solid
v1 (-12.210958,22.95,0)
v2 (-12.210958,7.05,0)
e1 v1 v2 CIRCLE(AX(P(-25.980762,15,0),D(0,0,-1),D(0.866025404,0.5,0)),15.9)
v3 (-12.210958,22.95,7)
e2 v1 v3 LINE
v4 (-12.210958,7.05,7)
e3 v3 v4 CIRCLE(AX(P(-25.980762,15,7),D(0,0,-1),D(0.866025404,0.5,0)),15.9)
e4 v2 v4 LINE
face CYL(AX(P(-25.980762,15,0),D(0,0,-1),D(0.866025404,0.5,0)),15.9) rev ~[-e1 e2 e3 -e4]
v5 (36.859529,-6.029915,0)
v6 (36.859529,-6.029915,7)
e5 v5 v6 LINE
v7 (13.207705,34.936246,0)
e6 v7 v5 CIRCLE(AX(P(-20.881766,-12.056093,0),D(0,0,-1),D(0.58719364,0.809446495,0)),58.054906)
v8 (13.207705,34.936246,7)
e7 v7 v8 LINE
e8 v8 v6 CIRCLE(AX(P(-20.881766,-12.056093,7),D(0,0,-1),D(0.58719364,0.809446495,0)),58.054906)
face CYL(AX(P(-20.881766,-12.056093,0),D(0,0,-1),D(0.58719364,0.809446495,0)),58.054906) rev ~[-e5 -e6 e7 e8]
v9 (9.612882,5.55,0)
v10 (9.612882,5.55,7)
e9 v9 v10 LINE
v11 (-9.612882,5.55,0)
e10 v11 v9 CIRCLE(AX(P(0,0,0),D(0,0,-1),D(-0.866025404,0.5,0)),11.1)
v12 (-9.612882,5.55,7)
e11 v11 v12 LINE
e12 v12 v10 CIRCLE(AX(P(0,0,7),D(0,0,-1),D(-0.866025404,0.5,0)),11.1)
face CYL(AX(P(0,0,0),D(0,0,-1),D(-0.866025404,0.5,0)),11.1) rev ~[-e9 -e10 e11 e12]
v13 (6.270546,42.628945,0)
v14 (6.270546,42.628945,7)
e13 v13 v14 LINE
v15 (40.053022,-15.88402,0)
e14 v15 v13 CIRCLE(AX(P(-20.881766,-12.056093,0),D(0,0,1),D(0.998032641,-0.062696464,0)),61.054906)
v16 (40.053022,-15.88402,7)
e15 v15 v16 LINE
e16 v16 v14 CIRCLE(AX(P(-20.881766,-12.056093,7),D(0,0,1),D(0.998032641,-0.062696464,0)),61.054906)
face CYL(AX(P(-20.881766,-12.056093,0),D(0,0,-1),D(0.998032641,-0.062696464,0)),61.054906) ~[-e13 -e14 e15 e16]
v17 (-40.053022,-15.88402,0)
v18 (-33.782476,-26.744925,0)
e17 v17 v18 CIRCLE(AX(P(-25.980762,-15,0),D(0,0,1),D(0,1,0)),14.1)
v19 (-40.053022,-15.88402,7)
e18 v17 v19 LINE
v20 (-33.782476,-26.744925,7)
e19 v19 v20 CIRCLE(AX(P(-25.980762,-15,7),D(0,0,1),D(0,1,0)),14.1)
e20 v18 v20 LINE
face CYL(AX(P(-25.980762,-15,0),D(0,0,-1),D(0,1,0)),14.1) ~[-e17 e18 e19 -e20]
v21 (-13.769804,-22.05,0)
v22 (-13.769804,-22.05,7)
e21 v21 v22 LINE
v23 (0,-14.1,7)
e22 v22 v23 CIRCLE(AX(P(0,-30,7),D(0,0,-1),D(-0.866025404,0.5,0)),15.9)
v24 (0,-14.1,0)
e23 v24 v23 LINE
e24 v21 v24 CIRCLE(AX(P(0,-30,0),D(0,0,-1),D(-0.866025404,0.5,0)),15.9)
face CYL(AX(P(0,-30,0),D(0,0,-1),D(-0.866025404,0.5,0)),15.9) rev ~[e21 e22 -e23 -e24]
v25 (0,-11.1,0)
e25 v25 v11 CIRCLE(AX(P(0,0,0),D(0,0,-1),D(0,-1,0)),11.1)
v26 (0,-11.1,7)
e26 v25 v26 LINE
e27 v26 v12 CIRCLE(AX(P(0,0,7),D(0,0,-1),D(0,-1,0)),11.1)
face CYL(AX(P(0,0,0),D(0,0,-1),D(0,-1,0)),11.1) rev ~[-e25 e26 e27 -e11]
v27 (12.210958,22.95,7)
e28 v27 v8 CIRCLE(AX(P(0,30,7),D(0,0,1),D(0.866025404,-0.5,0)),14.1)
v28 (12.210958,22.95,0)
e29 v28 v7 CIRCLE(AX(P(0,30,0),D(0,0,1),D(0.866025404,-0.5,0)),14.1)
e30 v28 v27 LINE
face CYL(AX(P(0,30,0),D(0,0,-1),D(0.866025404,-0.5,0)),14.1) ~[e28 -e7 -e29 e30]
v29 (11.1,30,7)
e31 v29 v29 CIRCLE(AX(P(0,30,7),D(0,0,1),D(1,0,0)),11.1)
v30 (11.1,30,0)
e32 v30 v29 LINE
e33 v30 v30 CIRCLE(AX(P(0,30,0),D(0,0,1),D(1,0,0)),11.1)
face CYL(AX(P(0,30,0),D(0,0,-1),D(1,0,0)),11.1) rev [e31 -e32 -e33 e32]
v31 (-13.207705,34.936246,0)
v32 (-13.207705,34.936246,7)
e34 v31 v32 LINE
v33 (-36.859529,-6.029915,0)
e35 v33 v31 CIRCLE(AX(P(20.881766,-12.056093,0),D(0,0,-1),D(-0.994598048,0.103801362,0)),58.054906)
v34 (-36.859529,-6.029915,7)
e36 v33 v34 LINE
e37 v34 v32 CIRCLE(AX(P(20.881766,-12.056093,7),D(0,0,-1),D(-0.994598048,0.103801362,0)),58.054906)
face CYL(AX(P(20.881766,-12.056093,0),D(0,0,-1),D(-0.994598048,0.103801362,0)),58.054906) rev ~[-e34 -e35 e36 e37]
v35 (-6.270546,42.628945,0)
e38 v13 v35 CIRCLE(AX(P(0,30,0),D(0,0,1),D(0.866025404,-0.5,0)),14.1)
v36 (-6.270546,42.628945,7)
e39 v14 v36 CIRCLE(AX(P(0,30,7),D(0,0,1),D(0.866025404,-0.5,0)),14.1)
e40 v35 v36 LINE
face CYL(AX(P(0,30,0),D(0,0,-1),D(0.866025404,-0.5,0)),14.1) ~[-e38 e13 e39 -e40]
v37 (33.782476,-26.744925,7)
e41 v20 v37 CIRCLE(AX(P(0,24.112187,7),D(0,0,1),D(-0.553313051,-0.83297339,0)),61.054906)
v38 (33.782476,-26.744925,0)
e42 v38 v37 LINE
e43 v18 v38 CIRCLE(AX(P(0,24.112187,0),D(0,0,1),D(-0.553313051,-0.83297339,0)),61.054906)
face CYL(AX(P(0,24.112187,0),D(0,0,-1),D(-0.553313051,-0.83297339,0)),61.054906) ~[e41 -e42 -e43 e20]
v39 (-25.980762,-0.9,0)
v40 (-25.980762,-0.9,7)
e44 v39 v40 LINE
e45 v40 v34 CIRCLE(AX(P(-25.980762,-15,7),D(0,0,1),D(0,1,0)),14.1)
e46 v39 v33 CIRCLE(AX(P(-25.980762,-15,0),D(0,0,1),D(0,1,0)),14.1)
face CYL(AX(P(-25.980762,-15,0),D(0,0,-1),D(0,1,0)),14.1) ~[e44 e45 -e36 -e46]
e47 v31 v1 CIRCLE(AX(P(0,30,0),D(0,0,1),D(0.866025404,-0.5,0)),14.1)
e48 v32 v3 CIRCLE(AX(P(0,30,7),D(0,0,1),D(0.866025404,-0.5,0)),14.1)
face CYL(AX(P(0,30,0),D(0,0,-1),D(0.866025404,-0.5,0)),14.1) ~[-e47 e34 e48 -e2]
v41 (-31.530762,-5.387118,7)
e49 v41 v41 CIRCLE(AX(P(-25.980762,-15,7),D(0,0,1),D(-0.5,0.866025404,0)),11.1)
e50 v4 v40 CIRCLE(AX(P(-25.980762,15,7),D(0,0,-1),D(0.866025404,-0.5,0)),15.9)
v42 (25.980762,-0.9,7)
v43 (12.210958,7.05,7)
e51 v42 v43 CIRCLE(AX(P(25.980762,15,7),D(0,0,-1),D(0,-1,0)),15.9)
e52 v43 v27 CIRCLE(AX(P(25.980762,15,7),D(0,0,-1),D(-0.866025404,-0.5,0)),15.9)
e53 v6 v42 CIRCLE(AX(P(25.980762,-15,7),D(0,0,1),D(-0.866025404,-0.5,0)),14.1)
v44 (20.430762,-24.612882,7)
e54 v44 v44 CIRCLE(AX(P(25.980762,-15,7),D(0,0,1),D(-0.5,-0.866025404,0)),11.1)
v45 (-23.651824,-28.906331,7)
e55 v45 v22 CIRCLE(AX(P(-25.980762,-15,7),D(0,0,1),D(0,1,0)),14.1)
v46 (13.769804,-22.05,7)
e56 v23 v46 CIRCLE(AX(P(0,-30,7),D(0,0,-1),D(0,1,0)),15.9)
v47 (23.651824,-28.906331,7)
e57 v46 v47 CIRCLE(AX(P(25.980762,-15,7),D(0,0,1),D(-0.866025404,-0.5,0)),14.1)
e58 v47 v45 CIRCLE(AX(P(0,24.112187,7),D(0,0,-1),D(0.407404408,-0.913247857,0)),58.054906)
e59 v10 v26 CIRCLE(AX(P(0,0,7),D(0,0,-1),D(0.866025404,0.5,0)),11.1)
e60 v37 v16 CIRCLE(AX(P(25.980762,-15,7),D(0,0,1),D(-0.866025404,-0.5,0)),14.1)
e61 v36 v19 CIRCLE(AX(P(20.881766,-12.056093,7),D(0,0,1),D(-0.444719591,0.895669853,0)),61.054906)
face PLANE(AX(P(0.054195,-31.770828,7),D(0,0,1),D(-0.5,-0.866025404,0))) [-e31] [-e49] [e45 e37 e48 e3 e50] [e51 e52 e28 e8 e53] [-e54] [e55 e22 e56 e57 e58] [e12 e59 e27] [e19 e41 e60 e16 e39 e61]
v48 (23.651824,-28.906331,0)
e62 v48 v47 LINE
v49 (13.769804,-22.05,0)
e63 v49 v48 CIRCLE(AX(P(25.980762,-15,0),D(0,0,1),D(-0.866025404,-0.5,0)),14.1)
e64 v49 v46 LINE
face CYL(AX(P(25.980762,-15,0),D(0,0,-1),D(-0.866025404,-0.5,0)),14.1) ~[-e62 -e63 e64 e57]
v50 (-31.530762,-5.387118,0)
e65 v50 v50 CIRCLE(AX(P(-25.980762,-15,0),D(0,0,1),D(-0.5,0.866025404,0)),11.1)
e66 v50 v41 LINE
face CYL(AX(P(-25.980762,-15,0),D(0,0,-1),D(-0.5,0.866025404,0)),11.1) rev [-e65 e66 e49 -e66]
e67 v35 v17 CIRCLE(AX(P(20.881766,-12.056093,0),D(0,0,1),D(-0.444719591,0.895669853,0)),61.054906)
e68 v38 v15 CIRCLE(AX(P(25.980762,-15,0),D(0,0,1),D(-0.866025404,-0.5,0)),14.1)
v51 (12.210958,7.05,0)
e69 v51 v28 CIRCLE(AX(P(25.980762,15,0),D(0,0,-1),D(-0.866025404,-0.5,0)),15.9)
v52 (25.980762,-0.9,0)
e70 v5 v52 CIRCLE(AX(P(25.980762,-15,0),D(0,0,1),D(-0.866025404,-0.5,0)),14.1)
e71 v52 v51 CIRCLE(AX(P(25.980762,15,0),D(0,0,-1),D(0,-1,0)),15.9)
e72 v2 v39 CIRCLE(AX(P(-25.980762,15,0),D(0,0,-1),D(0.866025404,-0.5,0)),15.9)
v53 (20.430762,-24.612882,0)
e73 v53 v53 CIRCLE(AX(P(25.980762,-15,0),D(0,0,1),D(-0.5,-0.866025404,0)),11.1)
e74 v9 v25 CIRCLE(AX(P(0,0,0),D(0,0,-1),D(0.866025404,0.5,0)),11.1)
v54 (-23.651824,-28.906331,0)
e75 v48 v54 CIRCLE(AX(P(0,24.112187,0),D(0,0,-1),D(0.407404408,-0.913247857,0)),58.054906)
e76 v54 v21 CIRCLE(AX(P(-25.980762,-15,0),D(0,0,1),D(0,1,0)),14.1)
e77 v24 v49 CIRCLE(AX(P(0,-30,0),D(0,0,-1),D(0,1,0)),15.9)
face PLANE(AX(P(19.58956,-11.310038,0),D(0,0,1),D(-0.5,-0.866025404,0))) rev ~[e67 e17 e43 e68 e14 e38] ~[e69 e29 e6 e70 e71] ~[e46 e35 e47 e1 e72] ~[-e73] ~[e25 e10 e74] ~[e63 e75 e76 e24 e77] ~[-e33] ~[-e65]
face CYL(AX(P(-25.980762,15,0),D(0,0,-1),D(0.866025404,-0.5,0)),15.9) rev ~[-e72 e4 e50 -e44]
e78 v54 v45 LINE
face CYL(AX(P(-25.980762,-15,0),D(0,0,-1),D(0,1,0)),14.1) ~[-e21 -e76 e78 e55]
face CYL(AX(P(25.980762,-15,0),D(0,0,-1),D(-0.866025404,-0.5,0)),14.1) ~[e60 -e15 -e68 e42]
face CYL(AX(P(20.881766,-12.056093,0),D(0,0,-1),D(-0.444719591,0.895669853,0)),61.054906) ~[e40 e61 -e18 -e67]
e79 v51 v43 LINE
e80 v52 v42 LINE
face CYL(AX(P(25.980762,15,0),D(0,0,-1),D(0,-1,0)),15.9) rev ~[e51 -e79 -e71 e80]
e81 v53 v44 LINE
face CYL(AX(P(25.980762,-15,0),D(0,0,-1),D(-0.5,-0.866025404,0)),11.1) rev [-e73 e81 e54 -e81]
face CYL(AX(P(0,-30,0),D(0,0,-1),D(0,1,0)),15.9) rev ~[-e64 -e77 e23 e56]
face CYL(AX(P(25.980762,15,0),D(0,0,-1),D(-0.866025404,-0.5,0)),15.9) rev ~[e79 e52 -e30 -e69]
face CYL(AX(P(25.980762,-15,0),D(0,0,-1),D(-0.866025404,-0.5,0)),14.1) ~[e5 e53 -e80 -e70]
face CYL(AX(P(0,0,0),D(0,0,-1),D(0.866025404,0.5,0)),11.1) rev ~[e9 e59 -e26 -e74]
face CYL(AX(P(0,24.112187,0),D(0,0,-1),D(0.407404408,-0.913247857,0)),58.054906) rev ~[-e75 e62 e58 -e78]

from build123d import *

# Parameters (mm, degrees)
F0_R            = 11.1
F1_DEPTH        = 7
F2_COUNT        = 3
F4_DEPTH        = 7
F4_COPIES_COUNT = 3


# Not quite as in the source:
# - a pattern or mirror of a feature is missing from the dataset's text; its kind, count and spacing are read off the source's solid


with BuildPart() as f1:
    # F0 (on Top) → F1 (new body)
    with BuildSketch(Plane.XY):
        with BuildLine():
            ThreePointArc((-9.612881982, 5.55), (0, 11.1), (9.612881982, 5.55))
            Line((9.612881982, 5.55), (12.2109581934, 7.05))
            ThreePointArc((12.2109581934, 7.05), (10.0807621135, 15), (12.2109581934, 22.95))
            ThreePointArc((12.2109581934, 22.95), (0, 44.1), (-12.2109581934, 22.95))
            ThreePointArc((-12.2109581934, 22.95), (-10.0807621135, 15), (-12.2109581934, 7.05))
            Line((-12.2109581934, 7.05), (-9.612881982, 5.55))
        make_face()
        with Locations((0, 30)):
            Circle(F0_R, mode=Mode.SUBTRACT)
    extrude(amount=F1_DEPTH)

    # F2: F1 ×3 about axis
    f2_axis = Axis((0, 0, 0), (0, 0, 1))


with BuildPart() as f1_1:
    add(f1.part)
    for i in range(1, F2_COUNT):
        add(f1.part.rotate(f2_axis, i * 360 / F2_COUNT))

    # F3 (on face) → F4 (join)
    with BuildSketch(Plane.XY):
        with BuildLine():
            Line((36.8595294383, -6.0299151903), (40.0530223584, -15.8840201358))
            ThreePointArc((40.0530223584, -15.8840201358), (31.9933329124, 18.4713593692), (6.2705462274, 42.6289449286))
            ThreePointArc((6.2705462274, 42.6289449286), (10.4711494103, 39.4427236552), (13.2077049817, 34.9362464602))
            ThreePointArc((13.2077049817, 34.9362464602), (29.395256701, 16.9713593692), (36.8595294383, -6.0299151903))
        make_face()
    f4 = extrude(amount=F4_DEPTH)

    # F4_copies: F4 ×3 about axis
    f4_copies_axis = Axis((0, 0, 0), (0, 0, 1))
    for i in range(1, F4_COPIES_COUNT):
        add(f4.rotate(f4_copies_axis, i * 360 / F4_COPIES_COUNT))


solid = f1_1.part
